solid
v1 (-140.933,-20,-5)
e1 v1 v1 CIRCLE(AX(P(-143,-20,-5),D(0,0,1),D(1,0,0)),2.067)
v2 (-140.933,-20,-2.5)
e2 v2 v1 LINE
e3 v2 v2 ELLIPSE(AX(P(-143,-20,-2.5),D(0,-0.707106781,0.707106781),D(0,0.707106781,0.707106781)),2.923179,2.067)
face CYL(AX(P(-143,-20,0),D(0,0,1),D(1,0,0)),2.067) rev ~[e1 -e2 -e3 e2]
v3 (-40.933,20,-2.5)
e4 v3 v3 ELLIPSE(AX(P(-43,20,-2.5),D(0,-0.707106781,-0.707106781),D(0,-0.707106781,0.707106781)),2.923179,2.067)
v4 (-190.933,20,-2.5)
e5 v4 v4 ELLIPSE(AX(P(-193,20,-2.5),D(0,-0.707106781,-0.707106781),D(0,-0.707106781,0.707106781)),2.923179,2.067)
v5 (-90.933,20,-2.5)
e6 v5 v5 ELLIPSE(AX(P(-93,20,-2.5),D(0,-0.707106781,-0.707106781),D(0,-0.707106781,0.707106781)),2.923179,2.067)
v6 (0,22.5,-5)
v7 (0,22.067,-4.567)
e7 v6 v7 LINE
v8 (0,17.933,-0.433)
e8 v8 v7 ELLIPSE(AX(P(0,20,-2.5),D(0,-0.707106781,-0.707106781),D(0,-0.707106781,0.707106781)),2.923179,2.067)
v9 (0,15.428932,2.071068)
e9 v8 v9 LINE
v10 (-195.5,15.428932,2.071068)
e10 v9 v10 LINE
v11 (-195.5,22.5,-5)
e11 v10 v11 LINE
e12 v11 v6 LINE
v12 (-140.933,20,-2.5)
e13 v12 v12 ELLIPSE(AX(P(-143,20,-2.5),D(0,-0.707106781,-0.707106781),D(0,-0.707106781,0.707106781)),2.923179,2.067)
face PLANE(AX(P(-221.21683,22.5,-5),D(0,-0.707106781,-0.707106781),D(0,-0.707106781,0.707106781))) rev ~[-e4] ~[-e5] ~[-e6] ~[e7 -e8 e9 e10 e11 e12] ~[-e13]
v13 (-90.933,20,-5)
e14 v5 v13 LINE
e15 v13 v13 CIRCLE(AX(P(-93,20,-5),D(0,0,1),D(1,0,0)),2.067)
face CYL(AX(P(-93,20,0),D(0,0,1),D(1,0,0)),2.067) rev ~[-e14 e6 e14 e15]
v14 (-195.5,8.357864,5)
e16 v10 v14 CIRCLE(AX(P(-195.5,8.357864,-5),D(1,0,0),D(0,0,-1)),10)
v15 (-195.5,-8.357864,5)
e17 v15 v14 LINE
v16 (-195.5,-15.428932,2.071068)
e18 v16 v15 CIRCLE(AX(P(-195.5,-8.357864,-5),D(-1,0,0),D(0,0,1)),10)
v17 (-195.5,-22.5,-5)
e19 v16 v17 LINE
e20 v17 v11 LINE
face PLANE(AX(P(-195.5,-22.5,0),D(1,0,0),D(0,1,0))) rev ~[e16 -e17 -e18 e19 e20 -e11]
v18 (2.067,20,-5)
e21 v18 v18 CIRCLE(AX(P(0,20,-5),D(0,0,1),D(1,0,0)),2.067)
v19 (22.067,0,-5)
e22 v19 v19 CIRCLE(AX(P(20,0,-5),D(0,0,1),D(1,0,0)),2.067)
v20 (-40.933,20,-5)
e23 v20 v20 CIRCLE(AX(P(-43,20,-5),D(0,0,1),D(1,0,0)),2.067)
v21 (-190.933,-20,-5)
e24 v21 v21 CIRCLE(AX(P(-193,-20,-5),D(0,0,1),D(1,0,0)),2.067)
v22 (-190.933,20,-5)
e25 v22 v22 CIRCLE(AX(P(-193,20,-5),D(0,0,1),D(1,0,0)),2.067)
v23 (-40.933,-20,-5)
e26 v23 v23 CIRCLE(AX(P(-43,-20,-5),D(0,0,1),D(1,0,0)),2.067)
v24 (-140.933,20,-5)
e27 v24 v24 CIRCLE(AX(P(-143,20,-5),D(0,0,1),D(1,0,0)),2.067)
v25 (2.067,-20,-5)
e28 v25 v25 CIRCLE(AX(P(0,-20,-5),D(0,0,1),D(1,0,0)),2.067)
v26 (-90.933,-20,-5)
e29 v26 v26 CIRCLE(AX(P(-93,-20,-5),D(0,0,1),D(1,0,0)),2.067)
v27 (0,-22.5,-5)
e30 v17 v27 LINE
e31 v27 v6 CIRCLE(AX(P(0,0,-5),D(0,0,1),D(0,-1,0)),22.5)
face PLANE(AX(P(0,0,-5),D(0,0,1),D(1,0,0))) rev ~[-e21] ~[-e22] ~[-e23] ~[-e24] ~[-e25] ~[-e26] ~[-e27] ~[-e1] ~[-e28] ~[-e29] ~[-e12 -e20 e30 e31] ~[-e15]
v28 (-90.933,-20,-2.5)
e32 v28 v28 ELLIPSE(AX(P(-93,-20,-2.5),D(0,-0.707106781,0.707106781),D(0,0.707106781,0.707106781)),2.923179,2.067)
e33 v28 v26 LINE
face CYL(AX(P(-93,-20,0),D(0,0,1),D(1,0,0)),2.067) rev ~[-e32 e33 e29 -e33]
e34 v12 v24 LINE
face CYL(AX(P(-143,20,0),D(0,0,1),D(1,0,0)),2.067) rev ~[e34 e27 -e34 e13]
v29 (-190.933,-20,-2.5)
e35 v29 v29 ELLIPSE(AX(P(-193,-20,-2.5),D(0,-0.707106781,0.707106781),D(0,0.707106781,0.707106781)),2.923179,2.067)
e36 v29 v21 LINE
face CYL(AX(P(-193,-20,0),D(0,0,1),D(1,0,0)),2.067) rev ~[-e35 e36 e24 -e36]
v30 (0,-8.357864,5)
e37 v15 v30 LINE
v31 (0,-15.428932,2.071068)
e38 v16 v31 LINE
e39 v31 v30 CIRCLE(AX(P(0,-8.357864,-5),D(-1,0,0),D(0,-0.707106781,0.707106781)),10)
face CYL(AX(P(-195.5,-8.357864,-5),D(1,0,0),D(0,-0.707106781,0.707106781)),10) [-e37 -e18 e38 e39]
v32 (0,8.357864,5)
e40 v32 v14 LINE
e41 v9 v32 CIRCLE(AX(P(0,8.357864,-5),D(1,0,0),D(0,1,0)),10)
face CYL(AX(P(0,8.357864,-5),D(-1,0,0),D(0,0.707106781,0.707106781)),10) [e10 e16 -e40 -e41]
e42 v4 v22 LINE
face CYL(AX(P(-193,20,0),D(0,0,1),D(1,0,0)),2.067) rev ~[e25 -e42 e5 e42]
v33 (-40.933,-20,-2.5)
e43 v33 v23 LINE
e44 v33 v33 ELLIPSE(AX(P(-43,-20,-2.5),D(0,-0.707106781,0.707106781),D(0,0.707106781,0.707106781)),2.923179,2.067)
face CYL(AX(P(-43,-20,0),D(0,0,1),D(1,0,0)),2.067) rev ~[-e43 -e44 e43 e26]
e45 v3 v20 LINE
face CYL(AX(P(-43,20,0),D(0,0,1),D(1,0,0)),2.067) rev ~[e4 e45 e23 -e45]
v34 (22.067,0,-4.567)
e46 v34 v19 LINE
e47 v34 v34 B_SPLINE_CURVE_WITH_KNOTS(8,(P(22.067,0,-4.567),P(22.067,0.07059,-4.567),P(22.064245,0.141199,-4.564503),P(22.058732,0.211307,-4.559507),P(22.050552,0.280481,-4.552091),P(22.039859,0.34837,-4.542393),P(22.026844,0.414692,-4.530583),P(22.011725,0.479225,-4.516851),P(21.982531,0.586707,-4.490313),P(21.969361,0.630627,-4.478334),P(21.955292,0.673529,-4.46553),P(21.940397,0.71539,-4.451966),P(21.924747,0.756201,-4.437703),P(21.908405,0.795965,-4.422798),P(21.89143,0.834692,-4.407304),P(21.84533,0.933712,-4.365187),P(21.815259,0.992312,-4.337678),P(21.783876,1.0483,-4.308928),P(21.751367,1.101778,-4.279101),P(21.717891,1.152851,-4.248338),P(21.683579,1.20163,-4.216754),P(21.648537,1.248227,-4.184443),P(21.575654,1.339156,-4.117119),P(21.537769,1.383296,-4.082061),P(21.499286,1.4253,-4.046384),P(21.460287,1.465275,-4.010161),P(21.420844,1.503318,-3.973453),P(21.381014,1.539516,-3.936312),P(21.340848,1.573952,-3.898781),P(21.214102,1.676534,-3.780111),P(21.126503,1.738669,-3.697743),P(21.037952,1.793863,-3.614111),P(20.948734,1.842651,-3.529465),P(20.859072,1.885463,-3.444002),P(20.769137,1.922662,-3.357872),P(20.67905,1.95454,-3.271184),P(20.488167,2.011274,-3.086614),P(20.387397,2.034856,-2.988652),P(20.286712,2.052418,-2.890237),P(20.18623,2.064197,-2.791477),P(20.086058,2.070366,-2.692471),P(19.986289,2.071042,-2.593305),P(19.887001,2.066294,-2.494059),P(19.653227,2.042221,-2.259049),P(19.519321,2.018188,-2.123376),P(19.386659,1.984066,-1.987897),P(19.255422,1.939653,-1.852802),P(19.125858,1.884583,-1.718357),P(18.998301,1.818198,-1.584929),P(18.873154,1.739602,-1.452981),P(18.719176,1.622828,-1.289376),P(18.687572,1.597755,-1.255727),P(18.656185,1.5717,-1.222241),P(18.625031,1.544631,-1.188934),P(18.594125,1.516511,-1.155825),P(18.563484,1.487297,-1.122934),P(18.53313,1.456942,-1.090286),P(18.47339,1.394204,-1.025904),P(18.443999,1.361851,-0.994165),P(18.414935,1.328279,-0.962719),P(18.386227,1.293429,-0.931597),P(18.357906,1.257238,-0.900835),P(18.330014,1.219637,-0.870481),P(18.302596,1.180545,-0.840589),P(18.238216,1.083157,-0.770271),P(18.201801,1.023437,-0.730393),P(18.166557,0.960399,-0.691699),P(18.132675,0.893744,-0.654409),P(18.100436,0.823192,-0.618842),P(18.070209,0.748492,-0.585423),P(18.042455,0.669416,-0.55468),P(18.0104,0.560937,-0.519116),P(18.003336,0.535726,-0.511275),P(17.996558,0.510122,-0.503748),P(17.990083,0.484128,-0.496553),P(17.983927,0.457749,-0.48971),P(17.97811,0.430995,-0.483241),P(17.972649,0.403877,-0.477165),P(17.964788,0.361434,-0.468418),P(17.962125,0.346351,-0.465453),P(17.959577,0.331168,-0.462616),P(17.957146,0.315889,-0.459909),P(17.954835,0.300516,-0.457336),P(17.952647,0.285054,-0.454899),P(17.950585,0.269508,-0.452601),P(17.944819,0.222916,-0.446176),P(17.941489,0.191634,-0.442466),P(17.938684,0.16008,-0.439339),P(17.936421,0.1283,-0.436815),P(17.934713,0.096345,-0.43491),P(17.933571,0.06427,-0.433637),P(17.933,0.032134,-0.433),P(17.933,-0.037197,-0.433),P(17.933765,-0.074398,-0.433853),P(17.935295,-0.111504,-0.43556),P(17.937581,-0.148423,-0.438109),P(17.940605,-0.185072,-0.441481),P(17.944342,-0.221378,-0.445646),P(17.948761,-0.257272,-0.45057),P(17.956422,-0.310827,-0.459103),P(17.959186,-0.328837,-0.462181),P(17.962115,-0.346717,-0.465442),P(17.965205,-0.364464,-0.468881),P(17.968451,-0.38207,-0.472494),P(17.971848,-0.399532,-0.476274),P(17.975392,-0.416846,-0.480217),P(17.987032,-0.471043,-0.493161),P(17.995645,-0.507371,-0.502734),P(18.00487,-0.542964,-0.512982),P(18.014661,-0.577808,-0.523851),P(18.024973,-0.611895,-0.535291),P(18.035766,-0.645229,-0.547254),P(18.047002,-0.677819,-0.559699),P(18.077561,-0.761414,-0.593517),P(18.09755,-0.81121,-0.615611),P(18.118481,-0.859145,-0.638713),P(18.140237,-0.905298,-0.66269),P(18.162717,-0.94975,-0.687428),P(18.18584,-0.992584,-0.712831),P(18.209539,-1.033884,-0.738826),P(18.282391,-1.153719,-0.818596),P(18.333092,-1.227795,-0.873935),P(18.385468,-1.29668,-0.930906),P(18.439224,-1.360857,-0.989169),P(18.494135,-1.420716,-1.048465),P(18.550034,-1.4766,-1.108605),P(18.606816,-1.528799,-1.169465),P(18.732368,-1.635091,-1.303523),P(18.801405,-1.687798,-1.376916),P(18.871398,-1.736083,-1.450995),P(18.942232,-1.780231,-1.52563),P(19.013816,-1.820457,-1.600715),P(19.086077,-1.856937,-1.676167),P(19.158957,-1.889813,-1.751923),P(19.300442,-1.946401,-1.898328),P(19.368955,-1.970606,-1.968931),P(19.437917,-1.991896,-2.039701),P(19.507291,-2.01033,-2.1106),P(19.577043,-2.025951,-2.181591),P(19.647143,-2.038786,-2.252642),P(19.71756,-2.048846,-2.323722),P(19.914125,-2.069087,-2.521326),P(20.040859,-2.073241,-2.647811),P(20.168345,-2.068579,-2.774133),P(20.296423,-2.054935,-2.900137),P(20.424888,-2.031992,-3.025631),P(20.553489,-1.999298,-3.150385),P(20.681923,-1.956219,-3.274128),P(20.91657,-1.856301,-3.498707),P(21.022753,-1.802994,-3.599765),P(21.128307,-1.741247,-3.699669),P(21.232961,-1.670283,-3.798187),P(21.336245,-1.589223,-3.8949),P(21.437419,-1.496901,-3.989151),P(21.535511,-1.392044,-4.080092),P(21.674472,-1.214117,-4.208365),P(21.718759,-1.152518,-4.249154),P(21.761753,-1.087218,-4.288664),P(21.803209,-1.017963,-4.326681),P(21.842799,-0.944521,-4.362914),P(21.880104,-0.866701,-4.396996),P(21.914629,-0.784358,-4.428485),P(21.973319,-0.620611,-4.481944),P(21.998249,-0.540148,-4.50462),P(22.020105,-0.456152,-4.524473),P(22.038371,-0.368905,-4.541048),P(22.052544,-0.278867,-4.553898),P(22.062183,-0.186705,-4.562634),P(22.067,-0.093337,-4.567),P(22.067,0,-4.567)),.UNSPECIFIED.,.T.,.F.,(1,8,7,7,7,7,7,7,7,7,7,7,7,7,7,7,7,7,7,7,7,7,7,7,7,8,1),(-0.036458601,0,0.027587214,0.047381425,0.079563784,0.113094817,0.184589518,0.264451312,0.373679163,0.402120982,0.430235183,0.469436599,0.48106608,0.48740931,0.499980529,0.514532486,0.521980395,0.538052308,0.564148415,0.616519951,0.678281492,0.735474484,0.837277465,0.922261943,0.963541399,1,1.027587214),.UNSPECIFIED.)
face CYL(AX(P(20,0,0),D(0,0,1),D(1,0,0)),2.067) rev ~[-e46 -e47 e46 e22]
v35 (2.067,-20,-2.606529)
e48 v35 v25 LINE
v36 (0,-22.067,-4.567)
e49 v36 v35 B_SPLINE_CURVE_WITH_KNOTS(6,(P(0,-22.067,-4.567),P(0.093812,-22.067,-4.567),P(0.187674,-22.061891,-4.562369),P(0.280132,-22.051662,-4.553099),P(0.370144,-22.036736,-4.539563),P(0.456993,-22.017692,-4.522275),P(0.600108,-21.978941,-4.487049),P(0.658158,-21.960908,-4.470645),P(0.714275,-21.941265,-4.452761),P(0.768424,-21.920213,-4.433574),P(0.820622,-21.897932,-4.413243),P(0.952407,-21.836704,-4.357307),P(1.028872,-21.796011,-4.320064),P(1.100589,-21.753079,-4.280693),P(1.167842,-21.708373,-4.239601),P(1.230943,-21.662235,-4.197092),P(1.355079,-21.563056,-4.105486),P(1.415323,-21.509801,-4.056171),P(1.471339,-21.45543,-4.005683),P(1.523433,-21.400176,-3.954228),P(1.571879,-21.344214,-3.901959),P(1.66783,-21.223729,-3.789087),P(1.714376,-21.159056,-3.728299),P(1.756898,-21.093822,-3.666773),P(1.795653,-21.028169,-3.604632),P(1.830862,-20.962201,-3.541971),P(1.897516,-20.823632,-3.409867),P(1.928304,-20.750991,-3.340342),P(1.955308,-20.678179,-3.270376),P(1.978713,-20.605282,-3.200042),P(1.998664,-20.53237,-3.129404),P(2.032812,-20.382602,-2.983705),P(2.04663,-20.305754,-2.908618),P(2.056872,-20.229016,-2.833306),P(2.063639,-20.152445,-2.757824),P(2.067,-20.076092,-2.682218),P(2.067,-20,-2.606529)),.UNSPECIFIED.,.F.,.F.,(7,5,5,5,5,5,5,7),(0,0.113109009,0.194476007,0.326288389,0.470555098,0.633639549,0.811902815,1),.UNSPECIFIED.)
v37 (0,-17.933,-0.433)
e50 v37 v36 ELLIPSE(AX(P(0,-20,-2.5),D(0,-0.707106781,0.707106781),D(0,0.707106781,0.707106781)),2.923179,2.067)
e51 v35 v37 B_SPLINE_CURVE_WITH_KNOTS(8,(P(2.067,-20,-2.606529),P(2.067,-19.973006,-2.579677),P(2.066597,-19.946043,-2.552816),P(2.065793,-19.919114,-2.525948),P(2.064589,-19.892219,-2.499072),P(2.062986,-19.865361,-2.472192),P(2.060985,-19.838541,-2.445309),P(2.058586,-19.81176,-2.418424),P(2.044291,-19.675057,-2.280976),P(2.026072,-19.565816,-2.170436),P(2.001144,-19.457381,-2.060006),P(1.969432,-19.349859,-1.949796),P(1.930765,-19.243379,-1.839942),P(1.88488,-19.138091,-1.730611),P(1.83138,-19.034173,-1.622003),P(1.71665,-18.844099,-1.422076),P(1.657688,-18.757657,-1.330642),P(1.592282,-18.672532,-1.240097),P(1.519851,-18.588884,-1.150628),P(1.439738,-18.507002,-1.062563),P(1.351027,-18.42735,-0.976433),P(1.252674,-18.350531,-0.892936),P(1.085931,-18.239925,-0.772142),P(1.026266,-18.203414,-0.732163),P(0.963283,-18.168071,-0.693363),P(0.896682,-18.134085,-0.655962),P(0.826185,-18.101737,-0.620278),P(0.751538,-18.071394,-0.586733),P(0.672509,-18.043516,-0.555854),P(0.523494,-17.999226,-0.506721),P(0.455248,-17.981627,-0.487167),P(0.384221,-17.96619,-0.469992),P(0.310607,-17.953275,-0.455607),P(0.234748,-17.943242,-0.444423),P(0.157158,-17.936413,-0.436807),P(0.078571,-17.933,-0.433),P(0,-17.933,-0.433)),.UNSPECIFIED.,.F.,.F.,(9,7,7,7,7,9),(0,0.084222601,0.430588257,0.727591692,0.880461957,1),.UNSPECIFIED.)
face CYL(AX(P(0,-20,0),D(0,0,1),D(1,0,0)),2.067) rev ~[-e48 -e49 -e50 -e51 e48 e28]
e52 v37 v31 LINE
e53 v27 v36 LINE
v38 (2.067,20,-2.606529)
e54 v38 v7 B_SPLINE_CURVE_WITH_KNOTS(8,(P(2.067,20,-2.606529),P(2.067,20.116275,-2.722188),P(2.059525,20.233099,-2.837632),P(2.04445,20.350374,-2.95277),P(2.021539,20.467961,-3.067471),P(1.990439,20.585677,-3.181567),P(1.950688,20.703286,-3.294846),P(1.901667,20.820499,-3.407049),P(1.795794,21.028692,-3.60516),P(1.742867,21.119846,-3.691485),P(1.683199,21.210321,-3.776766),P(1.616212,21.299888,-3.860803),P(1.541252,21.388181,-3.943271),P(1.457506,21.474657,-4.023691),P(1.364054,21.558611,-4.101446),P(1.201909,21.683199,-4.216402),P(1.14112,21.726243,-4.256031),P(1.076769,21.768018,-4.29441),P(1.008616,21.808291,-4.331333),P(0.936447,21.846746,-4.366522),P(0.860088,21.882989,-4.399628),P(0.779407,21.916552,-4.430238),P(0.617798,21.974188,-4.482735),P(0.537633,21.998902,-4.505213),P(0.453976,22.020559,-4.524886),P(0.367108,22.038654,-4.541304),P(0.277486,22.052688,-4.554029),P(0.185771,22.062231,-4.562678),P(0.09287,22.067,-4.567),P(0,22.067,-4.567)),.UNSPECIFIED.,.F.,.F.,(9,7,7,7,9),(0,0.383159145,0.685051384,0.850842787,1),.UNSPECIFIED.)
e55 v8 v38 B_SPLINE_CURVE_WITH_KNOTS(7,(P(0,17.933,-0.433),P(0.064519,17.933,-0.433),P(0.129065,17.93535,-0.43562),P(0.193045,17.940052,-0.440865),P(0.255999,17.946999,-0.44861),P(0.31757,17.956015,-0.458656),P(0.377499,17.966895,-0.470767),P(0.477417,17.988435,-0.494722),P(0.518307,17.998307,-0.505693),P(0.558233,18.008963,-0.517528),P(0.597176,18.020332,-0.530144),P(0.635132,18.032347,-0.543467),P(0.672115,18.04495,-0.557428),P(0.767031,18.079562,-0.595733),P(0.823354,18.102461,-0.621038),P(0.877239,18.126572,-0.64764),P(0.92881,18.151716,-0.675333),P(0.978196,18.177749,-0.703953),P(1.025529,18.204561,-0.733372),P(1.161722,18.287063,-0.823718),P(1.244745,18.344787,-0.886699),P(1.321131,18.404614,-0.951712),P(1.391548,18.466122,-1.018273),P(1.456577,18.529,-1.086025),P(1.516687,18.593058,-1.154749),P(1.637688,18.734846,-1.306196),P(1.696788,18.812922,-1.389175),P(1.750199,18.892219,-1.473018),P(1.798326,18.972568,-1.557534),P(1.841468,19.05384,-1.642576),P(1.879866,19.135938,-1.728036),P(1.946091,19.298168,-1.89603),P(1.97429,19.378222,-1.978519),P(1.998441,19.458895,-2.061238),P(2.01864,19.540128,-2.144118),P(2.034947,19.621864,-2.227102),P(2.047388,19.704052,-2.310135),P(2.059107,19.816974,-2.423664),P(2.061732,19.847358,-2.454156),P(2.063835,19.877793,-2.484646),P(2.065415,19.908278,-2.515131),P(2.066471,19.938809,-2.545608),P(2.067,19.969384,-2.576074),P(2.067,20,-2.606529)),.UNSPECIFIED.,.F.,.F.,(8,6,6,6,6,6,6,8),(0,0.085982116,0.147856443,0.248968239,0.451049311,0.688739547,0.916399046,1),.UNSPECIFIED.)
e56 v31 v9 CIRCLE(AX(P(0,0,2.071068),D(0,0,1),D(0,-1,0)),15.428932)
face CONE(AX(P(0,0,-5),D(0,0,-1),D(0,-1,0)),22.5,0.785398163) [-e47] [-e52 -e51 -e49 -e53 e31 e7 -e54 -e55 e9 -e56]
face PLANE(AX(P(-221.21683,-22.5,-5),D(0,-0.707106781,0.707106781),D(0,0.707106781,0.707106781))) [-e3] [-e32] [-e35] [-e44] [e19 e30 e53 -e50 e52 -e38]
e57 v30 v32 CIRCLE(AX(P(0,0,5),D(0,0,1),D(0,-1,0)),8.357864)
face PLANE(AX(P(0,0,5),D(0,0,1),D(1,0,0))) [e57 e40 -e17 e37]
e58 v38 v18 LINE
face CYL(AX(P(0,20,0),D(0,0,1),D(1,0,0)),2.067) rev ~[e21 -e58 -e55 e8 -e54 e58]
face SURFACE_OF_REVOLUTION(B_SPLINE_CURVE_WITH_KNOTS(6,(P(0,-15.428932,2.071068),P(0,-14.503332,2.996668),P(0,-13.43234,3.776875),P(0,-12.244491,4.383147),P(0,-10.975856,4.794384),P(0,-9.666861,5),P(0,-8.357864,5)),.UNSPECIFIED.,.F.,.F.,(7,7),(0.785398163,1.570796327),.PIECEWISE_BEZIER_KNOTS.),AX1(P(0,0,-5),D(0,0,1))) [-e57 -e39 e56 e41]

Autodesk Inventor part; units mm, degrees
ref_plane "YZ Plane" through (0, 0, 0) normal (1, 0, 0) x (0, 1, 0)
ref_plane "XZ Plane" through (0, 0, 0) normal (0, 1, 0) x (-1, 0, 0)
ref_plane "XY Plane" through (0, 0, 0) normal (0, 0, 1) x (1, 0, 0)
sketch "Sketch2" plane through (0, 0, 0) normal (0, 0, 1) x (1, 0, 0)
  circle A0 centre (-43, -20) radius 2.067
  circle A1 centre (-143, -20) radius 2.067
  circle A2 centre (-93, 20) radius 2.067
  circle A3 centre (-193, -20) radius 2.067
  circle A4 centre (20, 0) radius 2.067
  circle A5 centre (0, 20) radius 2.067
  circle A6 centre (-193, 20) radius 2.067
  circle A7 centre (-143, 20) radius 2.067
  circle A8 centre (-43, 20) radius 2.067
  circle A9 centre (-93, -20) radius 2.067
  circle A10 centre (0, -20) radius 2.067
  line L0 (-195.5, -22.5) -> (-195.5, 22.5)
  line L1 (-195.5, -22.5) -> (0, -22.5)
  arc A11 (0, -22.5) -> (0, 22.5) centre (0, 0) ccw
  line L2 (-195.5, 22.5) -> (0, 22.5)
  line L3 (0, -17.5) -> (-190.5, -17.5)
  line L4 (-190.5, -17.5) -> (-190.5, 17.5)
  line L5 (-190.5, 17.5) -> (0, 17.5)
  arc A12 (0, -17.5) -> (0, 17.5) centre (0, 0) ccw
  point P0 (-197.5, 0)
extrude "Extrusion1" add sketch "Sketch2" along normal mid plane 10 contours L0 L2 A11 L1 | L3 L4 L5 A12
chamfer "Chamfer1" distance 10 angle 45 3 edges at (-97.75, 22.5, 5) (22.5, 0, 5) (-97.75, -22.5, 5)
fillet "Fillet2" radius 10 3 edges at (-97.75, -12.5, 5) (12.5, 0, 5) (-97.75, 12.5, 5)
properties part number "Cover for robot head" material "Steel, Alloy"
